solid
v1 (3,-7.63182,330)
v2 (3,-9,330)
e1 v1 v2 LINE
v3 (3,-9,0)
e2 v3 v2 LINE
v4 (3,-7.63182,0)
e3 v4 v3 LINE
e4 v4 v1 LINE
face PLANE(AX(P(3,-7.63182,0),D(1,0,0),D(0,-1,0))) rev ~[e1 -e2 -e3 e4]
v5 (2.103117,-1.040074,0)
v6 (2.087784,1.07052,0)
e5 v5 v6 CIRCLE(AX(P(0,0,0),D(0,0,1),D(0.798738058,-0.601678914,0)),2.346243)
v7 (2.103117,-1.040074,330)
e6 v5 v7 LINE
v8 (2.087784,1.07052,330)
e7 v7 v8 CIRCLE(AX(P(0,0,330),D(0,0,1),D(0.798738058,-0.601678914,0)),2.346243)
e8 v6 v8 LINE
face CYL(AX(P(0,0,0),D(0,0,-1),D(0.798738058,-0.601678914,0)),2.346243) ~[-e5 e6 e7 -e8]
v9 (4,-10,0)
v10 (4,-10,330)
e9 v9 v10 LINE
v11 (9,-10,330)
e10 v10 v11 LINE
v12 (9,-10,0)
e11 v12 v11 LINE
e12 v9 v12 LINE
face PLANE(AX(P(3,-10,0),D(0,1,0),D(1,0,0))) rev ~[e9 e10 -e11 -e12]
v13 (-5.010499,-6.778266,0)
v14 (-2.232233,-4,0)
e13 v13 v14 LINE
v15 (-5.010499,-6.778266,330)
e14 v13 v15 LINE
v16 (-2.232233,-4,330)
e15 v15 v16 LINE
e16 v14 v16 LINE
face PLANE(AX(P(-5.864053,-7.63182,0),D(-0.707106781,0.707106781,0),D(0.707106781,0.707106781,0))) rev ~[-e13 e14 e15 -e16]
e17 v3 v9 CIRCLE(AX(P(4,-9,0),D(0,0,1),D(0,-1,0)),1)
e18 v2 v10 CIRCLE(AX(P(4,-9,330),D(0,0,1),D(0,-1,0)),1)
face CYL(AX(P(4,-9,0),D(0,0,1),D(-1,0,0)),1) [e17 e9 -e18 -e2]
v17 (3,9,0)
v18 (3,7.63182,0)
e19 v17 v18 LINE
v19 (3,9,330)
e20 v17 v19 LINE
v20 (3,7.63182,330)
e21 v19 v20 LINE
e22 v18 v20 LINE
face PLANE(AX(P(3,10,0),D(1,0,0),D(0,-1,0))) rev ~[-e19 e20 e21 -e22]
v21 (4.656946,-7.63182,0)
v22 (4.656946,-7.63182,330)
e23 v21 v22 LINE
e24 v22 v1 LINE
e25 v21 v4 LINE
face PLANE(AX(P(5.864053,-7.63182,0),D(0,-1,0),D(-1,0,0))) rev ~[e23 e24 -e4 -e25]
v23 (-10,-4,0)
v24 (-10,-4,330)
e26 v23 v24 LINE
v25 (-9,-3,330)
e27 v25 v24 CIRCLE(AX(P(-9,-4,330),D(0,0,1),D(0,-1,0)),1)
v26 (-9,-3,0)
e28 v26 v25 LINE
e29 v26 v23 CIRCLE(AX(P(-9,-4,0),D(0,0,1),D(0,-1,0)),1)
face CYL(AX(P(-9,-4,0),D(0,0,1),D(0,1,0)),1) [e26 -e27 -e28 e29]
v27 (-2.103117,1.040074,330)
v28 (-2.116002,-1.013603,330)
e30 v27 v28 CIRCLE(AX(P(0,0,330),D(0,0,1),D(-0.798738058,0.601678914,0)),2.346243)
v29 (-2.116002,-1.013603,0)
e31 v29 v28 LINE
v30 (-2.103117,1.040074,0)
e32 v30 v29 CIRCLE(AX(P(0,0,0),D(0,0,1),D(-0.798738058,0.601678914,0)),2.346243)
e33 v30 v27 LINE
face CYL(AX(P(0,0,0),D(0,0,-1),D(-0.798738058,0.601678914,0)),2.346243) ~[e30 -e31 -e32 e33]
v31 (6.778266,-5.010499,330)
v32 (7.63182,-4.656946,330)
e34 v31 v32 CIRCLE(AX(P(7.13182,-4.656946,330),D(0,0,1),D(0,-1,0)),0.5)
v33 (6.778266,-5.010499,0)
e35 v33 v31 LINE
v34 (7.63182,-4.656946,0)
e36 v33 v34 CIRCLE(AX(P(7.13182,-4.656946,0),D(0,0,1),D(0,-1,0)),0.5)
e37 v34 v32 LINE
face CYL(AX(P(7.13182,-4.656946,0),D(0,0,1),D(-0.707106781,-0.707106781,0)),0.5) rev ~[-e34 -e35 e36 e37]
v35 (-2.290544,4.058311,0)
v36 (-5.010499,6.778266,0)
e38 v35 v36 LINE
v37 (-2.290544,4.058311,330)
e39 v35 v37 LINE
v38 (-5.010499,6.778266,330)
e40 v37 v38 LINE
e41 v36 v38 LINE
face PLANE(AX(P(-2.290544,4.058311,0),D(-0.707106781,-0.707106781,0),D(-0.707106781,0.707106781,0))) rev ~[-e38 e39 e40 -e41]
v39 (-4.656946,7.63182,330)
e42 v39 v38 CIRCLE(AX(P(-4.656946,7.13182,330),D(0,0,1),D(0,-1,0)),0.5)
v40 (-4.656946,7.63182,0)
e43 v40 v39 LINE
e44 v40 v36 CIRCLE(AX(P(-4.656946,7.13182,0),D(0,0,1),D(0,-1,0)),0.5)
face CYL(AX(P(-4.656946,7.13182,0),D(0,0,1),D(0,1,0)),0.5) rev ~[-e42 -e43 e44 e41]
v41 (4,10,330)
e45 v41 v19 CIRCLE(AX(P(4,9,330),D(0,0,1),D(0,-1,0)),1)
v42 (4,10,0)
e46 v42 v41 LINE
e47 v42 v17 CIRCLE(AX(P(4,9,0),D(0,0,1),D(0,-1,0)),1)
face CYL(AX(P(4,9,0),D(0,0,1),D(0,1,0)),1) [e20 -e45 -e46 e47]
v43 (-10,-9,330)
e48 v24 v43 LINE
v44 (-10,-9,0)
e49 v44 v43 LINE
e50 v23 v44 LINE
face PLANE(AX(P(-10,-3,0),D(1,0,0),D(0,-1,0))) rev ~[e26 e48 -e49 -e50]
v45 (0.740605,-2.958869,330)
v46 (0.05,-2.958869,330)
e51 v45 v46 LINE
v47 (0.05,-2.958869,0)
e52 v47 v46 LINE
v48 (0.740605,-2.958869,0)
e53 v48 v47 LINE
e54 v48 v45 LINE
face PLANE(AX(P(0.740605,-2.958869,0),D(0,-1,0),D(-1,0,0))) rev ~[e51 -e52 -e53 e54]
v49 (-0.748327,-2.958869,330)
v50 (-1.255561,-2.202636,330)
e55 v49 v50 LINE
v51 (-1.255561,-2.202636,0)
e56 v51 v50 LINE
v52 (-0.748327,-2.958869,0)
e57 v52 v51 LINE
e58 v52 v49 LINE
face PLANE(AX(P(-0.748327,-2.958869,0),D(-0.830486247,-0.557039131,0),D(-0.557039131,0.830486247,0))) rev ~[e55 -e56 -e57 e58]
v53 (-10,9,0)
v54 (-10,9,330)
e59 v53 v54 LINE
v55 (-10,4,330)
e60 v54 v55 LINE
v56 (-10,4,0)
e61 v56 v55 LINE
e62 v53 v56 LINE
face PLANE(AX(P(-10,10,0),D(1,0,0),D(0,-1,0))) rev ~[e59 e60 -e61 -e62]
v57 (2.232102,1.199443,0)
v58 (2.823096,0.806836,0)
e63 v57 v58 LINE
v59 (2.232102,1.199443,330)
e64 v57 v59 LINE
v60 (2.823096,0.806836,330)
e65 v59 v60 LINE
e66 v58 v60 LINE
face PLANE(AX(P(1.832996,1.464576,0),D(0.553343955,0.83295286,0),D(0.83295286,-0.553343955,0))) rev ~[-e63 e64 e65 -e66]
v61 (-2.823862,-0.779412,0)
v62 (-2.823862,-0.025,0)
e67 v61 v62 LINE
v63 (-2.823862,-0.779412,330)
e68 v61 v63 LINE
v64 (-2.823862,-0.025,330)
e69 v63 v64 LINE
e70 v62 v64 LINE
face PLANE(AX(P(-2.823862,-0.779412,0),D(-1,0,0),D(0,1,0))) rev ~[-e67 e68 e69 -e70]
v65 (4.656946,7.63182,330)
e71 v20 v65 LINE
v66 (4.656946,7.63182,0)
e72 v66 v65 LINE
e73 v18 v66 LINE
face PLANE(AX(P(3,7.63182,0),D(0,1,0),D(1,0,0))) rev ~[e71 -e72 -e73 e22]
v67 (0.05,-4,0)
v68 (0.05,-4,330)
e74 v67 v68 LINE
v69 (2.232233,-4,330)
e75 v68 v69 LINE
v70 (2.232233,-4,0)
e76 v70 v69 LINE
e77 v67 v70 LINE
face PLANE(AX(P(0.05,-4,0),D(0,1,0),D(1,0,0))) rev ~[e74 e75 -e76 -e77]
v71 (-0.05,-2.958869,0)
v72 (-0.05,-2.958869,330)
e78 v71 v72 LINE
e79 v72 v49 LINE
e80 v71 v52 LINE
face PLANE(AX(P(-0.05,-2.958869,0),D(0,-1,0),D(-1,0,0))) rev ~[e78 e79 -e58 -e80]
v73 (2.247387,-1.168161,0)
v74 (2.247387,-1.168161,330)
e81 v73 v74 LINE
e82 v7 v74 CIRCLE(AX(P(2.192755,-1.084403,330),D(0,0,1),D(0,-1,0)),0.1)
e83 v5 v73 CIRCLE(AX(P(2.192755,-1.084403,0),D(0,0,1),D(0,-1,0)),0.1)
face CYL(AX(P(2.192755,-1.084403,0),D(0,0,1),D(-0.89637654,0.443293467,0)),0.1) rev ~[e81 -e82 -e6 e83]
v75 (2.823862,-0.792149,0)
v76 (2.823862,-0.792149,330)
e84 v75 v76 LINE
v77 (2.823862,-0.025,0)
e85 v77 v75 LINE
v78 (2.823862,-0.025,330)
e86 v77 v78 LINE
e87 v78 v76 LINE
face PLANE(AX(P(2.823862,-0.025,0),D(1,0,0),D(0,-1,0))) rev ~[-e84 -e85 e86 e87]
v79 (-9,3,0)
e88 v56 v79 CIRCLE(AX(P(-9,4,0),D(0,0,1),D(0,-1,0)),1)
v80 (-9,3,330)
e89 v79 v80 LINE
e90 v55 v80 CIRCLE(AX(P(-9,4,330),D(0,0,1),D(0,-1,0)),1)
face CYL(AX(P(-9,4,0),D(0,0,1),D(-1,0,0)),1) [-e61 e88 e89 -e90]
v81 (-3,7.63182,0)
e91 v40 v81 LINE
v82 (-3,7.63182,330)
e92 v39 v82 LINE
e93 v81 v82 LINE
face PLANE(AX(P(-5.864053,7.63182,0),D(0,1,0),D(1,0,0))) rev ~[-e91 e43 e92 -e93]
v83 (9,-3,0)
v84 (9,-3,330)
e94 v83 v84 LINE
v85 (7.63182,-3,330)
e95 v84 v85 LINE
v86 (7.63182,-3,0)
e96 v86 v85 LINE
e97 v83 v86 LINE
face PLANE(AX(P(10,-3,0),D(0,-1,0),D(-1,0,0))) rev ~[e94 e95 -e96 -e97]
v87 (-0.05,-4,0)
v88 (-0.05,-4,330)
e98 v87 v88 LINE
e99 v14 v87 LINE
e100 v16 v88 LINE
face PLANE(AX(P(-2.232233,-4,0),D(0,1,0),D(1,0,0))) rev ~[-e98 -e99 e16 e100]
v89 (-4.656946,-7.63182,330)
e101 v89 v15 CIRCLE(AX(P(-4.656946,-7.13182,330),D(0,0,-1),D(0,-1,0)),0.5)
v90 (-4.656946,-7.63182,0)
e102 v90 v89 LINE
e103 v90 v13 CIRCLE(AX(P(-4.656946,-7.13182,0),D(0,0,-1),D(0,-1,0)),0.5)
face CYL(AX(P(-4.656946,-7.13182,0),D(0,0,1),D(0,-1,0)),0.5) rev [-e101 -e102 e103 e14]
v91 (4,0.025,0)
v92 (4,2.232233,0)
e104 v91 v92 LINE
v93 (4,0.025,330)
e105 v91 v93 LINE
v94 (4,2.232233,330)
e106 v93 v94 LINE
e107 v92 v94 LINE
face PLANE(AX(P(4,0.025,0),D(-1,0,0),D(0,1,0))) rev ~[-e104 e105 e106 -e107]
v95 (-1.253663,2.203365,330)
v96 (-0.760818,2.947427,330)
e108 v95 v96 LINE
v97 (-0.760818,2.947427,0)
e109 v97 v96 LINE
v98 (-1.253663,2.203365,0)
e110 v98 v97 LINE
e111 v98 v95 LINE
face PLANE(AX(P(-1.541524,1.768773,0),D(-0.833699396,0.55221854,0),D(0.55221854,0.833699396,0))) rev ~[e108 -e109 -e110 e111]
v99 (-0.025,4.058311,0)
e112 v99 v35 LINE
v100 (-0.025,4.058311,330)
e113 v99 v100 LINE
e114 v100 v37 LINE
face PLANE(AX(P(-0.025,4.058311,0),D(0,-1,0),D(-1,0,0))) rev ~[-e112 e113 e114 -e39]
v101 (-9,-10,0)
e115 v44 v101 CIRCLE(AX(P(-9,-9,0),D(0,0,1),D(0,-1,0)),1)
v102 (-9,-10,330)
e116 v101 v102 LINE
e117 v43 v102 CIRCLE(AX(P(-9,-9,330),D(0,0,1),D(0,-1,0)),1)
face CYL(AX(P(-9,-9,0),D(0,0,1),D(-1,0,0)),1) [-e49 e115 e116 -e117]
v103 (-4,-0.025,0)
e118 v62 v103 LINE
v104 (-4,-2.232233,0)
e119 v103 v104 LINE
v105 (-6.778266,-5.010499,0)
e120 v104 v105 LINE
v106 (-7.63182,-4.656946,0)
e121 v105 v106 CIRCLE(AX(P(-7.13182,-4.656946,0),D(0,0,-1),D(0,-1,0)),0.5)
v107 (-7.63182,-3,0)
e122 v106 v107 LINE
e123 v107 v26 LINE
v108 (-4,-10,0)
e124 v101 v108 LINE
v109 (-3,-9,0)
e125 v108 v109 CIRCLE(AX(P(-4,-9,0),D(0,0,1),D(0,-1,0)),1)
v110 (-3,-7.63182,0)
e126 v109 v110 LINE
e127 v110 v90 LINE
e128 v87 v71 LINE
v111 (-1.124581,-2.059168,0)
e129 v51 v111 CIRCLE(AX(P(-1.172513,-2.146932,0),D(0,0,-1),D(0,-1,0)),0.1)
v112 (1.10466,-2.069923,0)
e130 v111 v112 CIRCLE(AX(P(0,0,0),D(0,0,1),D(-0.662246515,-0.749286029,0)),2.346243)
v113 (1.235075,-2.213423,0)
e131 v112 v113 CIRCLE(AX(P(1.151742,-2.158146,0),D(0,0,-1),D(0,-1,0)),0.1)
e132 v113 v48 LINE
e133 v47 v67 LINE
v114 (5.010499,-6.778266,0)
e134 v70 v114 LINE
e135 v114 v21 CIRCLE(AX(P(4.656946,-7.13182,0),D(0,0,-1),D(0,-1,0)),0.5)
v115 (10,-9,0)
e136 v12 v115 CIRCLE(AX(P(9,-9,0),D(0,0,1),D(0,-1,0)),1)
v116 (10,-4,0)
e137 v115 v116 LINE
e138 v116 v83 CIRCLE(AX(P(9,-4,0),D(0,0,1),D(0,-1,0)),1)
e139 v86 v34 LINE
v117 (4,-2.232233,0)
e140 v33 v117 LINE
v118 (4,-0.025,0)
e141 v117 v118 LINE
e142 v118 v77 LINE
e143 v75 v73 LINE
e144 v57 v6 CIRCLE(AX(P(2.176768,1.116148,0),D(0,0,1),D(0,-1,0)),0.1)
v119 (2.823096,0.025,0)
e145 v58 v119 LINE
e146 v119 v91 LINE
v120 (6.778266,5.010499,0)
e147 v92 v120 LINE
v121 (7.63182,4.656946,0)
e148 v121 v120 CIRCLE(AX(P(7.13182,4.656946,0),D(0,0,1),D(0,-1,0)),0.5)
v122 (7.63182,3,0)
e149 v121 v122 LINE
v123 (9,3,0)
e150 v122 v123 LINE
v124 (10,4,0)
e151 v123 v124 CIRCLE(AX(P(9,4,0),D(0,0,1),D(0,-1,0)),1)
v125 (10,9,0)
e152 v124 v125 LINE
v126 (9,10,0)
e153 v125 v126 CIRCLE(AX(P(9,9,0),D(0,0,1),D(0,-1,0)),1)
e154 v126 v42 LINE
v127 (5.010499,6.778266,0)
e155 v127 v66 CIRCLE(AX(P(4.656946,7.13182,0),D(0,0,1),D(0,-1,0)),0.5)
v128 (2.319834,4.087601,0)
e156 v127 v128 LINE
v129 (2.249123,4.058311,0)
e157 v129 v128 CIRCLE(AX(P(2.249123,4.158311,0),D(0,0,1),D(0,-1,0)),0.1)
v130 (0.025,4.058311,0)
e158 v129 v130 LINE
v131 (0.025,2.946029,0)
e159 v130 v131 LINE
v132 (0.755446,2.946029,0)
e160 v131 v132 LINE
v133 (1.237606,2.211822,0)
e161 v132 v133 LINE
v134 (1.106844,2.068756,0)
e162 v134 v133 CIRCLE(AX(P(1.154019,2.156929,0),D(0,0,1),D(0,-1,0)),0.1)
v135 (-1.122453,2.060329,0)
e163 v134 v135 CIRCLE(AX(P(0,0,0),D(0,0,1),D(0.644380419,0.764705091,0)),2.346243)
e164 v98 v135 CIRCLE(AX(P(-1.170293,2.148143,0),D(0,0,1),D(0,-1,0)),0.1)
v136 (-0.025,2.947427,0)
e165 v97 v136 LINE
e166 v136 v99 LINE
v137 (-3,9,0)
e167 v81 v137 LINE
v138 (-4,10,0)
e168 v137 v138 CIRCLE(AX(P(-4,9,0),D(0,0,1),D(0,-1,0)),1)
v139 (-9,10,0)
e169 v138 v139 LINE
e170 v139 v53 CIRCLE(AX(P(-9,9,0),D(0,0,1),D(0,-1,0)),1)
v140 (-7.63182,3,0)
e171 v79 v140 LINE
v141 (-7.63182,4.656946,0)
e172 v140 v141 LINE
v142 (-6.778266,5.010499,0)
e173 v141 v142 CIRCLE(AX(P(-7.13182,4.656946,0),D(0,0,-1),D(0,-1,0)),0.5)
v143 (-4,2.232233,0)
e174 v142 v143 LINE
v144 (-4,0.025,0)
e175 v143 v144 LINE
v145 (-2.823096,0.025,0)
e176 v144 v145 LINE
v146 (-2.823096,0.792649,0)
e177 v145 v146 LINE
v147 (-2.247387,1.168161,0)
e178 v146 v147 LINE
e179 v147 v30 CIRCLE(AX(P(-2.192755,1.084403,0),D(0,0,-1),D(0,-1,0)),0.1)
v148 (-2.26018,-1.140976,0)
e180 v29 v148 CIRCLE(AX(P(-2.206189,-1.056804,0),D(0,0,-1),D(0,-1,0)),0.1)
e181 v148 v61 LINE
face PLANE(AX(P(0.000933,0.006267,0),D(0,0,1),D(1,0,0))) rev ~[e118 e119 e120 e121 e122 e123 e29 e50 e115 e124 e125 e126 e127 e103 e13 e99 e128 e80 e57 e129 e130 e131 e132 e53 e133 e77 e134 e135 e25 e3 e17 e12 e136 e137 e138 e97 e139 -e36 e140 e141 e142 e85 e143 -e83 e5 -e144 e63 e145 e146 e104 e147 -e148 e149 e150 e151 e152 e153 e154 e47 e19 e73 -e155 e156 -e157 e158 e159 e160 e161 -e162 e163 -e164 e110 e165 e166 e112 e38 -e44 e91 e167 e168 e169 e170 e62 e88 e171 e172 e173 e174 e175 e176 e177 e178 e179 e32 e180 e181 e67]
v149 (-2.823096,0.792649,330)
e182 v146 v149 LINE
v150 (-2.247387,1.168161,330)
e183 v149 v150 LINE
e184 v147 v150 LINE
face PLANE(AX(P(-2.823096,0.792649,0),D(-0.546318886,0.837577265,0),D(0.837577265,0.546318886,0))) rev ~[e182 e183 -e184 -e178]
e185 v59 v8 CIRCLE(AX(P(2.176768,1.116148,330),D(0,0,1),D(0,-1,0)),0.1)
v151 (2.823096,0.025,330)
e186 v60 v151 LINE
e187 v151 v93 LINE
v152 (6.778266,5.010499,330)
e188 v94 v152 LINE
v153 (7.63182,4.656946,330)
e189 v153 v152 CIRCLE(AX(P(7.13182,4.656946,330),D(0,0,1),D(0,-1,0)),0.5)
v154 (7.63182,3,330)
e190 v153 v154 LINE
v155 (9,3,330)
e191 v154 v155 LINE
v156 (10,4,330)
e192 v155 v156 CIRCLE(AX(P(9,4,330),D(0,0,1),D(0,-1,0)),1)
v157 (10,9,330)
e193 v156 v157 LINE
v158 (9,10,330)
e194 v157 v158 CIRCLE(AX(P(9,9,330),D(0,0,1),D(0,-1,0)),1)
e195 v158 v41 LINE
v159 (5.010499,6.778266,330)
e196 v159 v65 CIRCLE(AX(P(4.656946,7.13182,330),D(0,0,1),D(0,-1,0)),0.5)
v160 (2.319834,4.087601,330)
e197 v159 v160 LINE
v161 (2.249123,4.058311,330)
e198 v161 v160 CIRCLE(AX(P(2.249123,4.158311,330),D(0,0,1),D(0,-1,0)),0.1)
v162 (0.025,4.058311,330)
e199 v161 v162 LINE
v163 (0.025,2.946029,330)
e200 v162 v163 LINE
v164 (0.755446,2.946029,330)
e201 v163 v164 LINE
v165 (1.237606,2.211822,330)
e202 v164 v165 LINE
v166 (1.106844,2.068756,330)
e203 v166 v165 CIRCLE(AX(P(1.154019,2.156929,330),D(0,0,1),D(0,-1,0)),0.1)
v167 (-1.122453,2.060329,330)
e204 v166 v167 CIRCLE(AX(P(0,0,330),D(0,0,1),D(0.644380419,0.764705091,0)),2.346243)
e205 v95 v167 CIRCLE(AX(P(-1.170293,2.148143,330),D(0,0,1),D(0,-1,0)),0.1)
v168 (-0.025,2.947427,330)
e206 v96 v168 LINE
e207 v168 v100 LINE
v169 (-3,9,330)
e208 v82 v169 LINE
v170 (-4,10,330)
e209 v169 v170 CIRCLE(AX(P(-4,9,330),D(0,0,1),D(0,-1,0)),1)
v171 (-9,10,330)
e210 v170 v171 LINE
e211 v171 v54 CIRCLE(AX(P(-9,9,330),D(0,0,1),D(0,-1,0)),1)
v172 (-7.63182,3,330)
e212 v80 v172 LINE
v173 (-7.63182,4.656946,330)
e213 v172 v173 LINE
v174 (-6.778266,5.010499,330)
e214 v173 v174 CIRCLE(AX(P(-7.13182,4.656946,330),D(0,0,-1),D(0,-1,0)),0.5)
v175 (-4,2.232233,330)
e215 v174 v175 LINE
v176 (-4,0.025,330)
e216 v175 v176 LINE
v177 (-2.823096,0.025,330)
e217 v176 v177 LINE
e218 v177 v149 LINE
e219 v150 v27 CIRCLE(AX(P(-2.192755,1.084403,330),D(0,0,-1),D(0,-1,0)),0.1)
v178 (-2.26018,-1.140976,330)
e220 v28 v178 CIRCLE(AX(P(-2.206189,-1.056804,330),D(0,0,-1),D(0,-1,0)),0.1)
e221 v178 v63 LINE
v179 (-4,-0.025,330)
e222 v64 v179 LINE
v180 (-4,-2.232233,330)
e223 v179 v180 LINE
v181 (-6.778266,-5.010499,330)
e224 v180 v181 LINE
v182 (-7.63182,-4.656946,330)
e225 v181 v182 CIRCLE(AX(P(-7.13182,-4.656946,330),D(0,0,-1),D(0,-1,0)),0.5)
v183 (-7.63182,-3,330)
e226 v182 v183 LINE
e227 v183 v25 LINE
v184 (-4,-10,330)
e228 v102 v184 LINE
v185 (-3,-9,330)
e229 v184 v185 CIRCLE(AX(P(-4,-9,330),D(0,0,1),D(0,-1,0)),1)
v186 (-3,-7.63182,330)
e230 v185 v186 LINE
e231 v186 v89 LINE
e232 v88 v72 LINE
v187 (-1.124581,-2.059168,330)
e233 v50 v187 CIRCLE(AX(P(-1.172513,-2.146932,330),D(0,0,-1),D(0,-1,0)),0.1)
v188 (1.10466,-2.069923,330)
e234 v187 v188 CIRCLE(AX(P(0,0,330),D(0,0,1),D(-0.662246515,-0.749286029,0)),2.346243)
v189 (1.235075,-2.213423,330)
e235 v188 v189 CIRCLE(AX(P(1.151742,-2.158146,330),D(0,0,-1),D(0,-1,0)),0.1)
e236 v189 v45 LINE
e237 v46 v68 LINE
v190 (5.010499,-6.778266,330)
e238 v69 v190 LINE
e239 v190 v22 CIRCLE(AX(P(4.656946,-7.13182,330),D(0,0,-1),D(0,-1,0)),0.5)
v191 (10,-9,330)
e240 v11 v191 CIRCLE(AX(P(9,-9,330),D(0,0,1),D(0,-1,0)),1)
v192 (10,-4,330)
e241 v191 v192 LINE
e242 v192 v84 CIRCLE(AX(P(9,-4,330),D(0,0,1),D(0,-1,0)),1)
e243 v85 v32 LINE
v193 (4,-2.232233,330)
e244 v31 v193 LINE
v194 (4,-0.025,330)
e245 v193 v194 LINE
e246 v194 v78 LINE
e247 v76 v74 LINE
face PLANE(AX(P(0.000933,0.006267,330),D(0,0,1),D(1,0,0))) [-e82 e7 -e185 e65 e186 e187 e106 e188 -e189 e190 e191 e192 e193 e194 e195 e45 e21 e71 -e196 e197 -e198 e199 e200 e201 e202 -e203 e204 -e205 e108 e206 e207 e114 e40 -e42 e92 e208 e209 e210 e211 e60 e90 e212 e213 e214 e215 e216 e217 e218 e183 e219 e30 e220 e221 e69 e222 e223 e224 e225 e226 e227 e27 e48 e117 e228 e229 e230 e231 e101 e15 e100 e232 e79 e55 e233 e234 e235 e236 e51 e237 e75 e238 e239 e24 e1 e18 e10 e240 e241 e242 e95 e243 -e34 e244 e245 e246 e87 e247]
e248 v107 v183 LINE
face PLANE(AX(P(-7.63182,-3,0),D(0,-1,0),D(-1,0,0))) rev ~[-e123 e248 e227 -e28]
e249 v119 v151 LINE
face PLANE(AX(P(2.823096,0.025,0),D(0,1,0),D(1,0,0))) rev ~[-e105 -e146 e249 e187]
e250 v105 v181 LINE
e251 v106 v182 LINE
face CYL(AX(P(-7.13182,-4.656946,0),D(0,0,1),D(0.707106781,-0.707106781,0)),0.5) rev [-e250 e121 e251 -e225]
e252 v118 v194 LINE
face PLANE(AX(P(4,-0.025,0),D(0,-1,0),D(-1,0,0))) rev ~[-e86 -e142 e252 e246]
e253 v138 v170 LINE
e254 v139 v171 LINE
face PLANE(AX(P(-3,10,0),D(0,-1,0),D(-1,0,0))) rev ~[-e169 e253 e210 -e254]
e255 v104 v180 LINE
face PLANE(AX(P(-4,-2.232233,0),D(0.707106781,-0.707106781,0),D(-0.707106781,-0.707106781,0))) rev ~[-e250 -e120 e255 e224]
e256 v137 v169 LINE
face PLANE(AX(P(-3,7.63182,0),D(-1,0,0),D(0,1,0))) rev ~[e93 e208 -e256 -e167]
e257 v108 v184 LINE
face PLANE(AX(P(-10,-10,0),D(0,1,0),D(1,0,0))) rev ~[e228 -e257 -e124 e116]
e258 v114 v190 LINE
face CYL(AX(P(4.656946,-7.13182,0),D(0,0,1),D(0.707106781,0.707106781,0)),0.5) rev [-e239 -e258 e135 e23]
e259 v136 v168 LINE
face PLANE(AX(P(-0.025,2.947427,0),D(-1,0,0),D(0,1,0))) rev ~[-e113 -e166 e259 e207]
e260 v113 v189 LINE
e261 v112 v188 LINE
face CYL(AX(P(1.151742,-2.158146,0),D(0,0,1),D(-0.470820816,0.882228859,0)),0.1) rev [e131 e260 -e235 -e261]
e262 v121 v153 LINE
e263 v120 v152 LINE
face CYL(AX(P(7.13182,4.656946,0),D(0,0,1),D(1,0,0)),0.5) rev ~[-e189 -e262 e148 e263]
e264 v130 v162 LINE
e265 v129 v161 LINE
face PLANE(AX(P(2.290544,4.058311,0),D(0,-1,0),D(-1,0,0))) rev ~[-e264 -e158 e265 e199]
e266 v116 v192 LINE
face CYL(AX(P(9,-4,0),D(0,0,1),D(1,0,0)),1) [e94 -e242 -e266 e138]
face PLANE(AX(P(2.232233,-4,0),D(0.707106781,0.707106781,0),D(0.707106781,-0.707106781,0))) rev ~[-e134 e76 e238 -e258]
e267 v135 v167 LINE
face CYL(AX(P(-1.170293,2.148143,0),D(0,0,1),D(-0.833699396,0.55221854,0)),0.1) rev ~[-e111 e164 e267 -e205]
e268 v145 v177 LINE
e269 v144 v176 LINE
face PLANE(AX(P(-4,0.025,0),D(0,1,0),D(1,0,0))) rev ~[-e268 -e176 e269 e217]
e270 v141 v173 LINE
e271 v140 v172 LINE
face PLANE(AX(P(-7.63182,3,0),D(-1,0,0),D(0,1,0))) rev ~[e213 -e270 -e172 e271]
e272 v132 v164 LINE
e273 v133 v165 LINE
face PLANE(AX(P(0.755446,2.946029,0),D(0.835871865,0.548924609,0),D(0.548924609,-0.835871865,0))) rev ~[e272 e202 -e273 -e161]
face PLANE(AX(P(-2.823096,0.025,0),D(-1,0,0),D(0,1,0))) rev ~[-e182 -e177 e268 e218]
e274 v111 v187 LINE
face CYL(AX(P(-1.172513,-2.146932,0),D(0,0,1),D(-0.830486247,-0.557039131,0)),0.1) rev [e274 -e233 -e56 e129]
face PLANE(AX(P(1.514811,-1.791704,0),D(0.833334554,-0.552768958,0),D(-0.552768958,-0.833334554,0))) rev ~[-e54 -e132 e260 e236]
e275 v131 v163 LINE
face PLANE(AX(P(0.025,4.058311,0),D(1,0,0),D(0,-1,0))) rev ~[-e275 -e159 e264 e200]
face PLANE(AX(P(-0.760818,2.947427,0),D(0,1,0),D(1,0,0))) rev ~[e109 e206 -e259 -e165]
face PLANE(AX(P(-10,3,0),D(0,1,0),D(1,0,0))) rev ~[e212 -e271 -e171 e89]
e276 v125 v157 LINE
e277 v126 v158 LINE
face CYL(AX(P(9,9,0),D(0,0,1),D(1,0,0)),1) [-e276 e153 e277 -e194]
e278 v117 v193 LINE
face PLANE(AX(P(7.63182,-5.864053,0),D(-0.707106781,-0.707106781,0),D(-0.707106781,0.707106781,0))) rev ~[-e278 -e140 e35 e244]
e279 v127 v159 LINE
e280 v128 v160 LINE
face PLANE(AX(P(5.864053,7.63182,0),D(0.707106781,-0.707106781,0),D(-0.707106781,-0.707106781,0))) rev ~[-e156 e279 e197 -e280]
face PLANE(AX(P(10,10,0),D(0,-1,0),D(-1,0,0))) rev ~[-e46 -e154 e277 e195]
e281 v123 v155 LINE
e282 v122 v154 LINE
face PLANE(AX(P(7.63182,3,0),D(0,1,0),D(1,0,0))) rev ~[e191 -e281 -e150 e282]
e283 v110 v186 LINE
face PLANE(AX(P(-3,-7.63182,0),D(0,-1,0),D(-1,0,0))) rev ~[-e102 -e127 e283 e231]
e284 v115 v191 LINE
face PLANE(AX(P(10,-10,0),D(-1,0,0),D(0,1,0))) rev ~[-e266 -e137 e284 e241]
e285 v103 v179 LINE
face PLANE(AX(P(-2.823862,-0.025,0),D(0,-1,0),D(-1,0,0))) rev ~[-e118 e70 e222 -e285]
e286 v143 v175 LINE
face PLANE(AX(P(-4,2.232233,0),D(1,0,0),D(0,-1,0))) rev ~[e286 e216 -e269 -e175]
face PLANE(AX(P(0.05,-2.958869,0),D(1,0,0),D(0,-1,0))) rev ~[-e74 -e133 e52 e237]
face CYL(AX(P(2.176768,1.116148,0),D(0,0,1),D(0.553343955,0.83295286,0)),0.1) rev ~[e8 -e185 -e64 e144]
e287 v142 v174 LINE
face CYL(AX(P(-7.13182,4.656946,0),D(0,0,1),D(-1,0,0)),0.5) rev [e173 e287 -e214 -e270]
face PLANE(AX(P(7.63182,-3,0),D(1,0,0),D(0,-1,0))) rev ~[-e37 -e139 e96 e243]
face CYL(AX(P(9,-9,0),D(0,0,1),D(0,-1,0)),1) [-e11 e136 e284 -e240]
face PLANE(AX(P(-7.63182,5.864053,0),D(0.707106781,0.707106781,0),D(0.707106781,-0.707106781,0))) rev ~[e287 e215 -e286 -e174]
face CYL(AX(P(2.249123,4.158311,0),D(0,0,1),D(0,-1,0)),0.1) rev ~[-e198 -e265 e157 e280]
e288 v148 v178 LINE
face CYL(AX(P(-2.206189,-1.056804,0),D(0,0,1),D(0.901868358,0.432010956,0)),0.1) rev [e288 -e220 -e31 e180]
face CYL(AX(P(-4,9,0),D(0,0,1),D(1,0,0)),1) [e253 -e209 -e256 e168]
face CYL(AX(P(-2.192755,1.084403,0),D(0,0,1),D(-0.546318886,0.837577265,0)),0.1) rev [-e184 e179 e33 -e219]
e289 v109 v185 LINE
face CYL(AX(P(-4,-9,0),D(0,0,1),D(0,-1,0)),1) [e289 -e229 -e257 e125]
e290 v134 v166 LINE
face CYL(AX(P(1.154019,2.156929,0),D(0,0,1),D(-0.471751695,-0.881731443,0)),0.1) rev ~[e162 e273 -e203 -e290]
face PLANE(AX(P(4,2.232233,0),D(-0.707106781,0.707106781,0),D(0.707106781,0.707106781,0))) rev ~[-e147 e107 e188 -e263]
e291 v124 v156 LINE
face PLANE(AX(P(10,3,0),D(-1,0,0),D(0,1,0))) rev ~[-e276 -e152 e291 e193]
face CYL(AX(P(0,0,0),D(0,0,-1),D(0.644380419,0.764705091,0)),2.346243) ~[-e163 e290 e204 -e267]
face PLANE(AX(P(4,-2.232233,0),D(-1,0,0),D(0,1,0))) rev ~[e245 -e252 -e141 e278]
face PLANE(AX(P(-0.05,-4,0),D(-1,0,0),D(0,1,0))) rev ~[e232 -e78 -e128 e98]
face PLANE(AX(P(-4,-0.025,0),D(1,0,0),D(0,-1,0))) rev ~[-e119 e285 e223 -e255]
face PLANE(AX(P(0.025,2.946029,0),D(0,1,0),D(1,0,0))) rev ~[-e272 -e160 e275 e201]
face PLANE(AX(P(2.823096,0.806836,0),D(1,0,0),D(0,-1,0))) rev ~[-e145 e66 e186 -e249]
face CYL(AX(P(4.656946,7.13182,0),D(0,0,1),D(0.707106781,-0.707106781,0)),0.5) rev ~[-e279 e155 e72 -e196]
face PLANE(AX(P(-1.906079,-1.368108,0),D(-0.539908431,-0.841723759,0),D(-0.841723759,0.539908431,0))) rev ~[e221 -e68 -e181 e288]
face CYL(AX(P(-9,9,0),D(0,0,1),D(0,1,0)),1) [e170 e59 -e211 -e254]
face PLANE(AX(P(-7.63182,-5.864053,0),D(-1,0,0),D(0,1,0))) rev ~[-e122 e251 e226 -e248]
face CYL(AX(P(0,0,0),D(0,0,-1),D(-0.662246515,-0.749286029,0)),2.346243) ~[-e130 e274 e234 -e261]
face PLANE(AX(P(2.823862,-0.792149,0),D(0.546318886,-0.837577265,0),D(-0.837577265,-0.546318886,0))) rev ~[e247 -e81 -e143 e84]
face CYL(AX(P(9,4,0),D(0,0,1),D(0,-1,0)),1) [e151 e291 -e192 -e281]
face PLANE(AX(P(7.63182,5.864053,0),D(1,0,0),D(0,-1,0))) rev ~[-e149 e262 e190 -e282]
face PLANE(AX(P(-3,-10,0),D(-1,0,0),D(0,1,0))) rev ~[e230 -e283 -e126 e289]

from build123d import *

# Parameters (mm, degrees)
F1_DEPTH = 330
F2_R     = 1
F3_R     = 0.5
F4_R     = 0.1


with BuildPart() as f1:
    # F0 (on Top) → F1 (new body)
    with BuildSketch(Plane.XY):
        with BuildLine():
            Line((-0.025, 4.0583112277), (-2.2905442747, 4.0583112277))
            Line((-2.2905442747, 4.0583112277), (-5.8640526549, 7.6318196079))
            Line((-5.8640526549, 7.6318196079), (-3, 7.6318196079))
            Line((-3, 7.6318196079), (-3, 10))
            Line((-3, 10), (-10, 10))
            Line((-10, 10), (-10, 3))
            Line((-10, 3), (-7.6318196079, 3))
            Line((-7.6318196079, 3), (-7.6318196079, 5.8640526549))
            Line((-7.6318196079, 5.8640526549), (-4, 2.232233047))
            Line((-4, 2.232233047), (-4, 0.025))
            Line((-4, 0.025), (-2.8230957687, 0.025))
            Line((-2.8230957687, 0.025), (-2.8230957687, 0.7926485917))
            Line((-2.8230957687, 0.7926485917), (-1.8740334308, 1.411684829))
            ThreePointArc((-1.8740334308, 1.411684829), (-2.3460869309, 0.0270456781), (-1.906078865, -1.3681077138))
            Line((-1.906078865, -1.3681077138), (-2.8238623803, -0.7794121329))
            Line((-2.8238623803, -0.7794121329), (-2.8238623803, -0.025))
            Line((-2.8238623803, -0.025), (-4, -0.025))
            Line((-4, -0.025), (-4, -2.232233047))
            Line((-4, -2.232233047), (-7.6318196079, -5.8640526549))
            Line((-7.6318196079, -5.8640526549), (-7.6318196079, -3))
            Line((-7.6318196079, -3), (-10, -3))
            Line((-10, -3), (-10, -10))
            Line((-10, -10), (-3, -10))
            Line((-3, -10), (-3, -7.6318196079))
            Line((-3, -7.6318196079), (-5.8640526549, -7.6318196079))
            Line((-5.8640526549, -7.6318196079), (-2.232233047, -4))
            Line((-2.232233047, -4), (-0.05, -4))
            Line((-0.05, -4), (-0.05, -2.9588690959))
            Line((-0.05, -2.9588690959), (-0.7483266194, -2.9588690959))
            Line((-0.7483266194, -2.9588690959), (-1.5537911294, -1.7580069631))
            ThreePointArc((-1.5537911294, -1.7580069631), (-0.0257632285, -2.3461013645), (1.5148107083, -1.7917041816))
            Line((1.5148107083, -1.7917041816), (0.7406048023, -2.9588690959))
            Line((0.7406048023, -2.9588690959), (0.05, -2.9588690959))
            Line((0.05, -2.9588690959), (0.05, -4))
            Line((0.05, -4), (2.232233047, -4))
            Line((2.232233047, -4), (5.8640526549, -7.6318196079))
            Line((5.8640526549, -7.6318196079), (3, -7.6318196079))
            Line((3, -7.6318196079), (3, -10))
            Line((3, -10), (10, -10))
            Line((10, -10), (10, -3))
            Line((10, -3), (7.6318196079, -3))
            Line((7.6318196079, -3), (7.6318196079, -5.8640526549))
            Line((7.6318196079, -5.8640526549), (4, -2.232233047))
            Line((4, -2.232233047), (4, -0.025))
            Line((4, -0.025), (2.8238623803, -0.025))
            Line((2.8238623803, -0.025), (2.8238623803, -0.7921485609))
            Line((2.8238623803, -0.7921485609), (1.8740334308, -1.411684829))
            ThreePointArc((1.8740334308, -1.411684829), (2.3460040432, 0.0334721598), (1.8329957125, 1.4645757318))
            Line((1.8329957125, 1.4645757318), (2.8230957687, 0.8068363719))
            Line((2.8230957687, 0.8068363719), (2.8230957687, 0.025))
            Line((2.8230957687, 0.025), (4, 0.025))
            Line((4, 0.025), (4, 2.232233047))
            Line((4, 2.232233047), (7.6318196079, 5.8640526549))
            Line((7.6318196079, 5.8640526549), (7.6318196079, 3))
            Line((7.6318196079, 3), (10, 3))
            Line((10, 3), (10, 10))
            Line((10, 10), (3, 10))
            Line((3, 10), (3, 7.6318196079))
            Line((3, 7.6318196079), (5.8640526549, 7.6318196079))
            Line((5.8640526549, 7.6318196079), (2.2905442747, 4.0583112277))
            Line((2.2905442747, 4.0583112277), (0.025, 4.0583112277))
            Line((0.025, 4.0583112277), (0.025, 2.9460287187))
            Line((0.025, 2.9460287187), (0.7554459771, 2.9460287187))
            Line((0.7554459771, 2.9460287187), (1.5118729288, 1.7941838266))
            ThreePointArc((1.5118729288, 1.7941838266), (-0.0195250931, 2.3461615731), (-1.5415243666, 1.7687730164))
            Line((-1.5415243666, 1.7687730164), (-0.7608180556, 2.9474266339))
            Line((-0.7608180556, 2.9474266339), (-0.025, 2.9474266339))
            Line((-0.025, 2.9474266339), (-0.025, 4.0583112277))
        make_face()
    extrude(amount=F1_DEPTH)

    # F2
    f2_edges = [f1.edges().sort_by_distance(p)[0] for p in [
        (10, 10, 165),
        (10, -10, 165),
        (-10, -10, 165),
        (-3, -10, 165),
        (3, -10, 165),
        (-3, 10, 165),
        (-10, 3, 165),
        (10, 3, 165),
        (10, -3, 165),
        (-10, -3, 165),
        (-10, 10, 165),
        (3, 10, 165),
    ]]
    fillet(f2_edges, radius=F2_R)

    # F3
    f3_edges = [f1.edges().sort_by_distance(p)[0] for p in [
        (-7.63182, 5.864053, 165),
        (-5.864053, 7.63182, 165),
        (5.864053, 7.63182, 165),
        (7.63182, 5.864053, 165),
        (-7.63182, -5.864053, 165),
        (-5.864053, -7.63182, 165),
        (5.864053, -7.63182, 165),
        (7.63182, -5.864053, 165),
    ]]
    fillet(f3_edges, radius=F3_R)

    # F4
    f4_edges = [f1.edges().sort_by_distance(p)[0] for p in [
        (-1.874033, 1.411685, 165),
        (2.290544, 4.058311, 165),
        (4.656946, 7.63182, 165),
        (-1.541524, 1.768773, 165),
        (1.514811, -1.791704, 165),
        (1.874033, -1.411685, 165),
        (1.832996, 1.464576, 165),
        (1.511873, 1.794184, 165),
        (-1.906079, -1.368108, 165),
        (-1.553791, -1.758007, 165),
    ]]
    fillet(f4_edges, radius=F4_R)


solid = f1.part
